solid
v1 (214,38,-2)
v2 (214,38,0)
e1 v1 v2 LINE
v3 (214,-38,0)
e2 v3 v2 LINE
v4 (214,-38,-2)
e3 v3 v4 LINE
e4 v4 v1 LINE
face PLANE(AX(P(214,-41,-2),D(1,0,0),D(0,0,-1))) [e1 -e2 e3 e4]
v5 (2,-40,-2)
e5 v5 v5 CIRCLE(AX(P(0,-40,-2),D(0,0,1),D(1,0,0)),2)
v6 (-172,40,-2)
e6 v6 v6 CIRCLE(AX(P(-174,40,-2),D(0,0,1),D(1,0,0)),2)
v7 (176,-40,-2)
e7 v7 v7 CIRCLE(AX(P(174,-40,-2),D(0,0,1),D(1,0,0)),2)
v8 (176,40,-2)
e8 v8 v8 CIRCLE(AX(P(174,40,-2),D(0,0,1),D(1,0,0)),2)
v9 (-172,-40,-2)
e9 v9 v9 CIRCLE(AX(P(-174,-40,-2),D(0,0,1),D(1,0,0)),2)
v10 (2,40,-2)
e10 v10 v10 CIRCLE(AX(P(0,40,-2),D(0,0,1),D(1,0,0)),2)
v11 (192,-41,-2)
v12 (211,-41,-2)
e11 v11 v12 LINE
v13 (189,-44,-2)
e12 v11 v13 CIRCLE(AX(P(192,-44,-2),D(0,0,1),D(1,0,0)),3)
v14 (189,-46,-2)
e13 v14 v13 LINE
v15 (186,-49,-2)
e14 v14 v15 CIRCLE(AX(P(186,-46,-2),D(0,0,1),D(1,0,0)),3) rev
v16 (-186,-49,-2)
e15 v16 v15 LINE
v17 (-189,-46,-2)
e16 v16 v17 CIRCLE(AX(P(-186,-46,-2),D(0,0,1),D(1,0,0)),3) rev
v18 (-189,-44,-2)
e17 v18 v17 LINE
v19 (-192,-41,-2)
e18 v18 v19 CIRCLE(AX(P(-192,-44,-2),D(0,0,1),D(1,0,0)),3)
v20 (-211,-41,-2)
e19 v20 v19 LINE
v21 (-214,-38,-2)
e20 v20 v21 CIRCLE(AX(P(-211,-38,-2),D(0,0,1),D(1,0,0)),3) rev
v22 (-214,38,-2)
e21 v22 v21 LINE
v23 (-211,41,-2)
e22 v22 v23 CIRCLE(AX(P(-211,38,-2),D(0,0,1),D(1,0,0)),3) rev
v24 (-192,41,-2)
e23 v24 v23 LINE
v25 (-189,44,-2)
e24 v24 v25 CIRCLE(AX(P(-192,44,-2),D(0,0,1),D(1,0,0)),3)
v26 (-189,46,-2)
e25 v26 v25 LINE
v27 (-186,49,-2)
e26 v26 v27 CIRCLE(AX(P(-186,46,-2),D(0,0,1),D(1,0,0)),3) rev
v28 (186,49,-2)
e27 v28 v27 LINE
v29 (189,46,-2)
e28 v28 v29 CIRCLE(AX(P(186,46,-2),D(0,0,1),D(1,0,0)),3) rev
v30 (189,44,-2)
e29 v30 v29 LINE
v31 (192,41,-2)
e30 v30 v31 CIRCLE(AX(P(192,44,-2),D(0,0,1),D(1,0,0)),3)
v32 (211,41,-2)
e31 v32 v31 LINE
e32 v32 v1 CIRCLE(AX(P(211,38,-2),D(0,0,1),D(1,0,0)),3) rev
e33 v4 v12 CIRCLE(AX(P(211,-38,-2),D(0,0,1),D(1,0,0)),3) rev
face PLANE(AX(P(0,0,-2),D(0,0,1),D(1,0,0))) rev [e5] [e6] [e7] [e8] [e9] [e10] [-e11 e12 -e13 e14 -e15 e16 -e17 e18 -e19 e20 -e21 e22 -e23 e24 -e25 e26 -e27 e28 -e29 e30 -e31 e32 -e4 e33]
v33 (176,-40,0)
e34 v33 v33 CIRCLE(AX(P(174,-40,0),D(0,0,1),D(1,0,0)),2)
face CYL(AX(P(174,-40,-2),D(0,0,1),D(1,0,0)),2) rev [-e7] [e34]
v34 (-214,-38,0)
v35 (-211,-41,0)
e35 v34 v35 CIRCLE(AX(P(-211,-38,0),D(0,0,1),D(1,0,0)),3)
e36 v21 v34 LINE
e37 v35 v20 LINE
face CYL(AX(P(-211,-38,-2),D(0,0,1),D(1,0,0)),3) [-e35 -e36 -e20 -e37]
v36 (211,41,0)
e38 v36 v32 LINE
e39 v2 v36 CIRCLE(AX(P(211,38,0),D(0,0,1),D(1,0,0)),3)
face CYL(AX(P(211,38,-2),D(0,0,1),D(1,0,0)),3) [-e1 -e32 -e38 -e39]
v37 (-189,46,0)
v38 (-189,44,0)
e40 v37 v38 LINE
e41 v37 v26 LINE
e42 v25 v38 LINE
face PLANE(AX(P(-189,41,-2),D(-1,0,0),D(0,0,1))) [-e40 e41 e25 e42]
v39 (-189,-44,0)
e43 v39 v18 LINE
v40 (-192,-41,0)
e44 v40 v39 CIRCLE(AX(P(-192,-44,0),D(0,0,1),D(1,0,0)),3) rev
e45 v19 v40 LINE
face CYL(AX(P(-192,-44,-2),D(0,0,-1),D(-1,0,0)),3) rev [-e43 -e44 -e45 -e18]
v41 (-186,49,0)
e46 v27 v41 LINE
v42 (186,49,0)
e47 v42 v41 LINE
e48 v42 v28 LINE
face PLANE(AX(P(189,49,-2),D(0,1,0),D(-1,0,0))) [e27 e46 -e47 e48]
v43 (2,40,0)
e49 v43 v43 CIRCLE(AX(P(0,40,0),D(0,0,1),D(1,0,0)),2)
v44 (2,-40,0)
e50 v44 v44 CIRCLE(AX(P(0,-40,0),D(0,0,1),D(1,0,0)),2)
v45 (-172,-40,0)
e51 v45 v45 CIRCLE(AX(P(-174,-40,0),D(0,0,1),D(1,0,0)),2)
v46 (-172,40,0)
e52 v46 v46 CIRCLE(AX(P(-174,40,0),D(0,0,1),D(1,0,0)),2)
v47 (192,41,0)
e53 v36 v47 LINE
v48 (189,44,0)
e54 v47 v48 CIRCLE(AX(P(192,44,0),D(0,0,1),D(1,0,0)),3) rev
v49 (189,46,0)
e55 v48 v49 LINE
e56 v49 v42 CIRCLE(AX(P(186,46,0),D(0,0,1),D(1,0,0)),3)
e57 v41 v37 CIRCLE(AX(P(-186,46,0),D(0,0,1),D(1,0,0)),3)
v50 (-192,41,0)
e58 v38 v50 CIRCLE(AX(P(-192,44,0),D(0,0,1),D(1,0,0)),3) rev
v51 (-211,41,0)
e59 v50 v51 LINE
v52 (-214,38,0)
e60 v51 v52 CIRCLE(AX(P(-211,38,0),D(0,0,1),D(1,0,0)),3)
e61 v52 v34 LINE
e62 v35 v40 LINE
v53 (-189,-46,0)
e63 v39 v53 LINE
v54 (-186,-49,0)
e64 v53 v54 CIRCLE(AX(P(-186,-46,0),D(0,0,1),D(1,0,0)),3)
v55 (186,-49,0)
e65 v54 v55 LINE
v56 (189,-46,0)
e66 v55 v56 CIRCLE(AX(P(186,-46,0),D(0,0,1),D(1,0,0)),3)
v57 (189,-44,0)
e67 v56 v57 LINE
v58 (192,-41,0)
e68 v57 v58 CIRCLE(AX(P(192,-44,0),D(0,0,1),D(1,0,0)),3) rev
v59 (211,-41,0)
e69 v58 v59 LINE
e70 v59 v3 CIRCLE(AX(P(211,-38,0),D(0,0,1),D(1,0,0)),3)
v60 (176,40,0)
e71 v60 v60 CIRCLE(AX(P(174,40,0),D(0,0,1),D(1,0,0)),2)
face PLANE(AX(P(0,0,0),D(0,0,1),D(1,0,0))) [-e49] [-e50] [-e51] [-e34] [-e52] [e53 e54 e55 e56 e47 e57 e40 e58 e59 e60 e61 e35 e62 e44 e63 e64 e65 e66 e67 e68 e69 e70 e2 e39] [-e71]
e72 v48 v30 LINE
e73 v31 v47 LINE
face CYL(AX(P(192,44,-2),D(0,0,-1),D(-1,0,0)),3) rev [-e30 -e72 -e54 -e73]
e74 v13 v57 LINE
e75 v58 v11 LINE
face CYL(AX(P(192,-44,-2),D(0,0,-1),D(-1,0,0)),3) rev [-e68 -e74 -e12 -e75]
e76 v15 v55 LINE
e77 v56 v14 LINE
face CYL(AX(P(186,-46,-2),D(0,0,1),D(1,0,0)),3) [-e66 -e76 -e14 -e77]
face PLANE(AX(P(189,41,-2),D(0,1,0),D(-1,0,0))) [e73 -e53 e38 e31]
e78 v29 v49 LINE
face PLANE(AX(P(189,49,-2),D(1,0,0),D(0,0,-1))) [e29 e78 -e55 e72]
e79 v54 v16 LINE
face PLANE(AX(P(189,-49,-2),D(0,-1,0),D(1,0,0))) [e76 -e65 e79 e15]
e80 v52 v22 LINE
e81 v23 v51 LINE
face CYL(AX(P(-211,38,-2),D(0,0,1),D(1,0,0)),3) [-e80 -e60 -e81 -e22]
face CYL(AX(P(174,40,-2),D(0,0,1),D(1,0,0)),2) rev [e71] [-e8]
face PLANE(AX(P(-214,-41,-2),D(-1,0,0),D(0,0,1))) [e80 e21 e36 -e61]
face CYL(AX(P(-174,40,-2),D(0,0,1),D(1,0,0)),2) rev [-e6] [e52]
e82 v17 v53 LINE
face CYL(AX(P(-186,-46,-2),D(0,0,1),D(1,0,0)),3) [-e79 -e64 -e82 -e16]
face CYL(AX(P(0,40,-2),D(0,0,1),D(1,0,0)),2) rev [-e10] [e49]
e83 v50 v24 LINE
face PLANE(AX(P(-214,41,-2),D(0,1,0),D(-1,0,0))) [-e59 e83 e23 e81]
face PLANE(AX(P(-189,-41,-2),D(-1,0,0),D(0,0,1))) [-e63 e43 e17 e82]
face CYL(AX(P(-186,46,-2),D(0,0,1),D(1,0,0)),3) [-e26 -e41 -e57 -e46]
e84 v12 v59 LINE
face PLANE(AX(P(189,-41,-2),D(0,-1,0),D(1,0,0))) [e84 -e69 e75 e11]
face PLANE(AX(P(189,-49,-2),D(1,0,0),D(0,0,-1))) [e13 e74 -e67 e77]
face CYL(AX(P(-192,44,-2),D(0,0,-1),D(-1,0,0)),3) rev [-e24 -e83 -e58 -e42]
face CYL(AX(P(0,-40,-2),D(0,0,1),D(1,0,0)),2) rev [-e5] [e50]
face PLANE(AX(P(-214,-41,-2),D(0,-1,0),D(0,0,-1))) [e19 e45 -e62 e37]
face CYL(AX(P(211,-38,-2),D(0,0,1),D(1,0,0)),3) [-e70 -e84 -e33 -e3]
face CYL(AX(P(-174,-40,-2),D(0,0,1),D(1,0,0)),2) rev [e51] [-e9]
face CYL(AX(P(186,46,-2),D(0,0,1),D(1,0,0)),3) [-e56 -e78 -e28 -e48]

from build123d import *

# Parameters (mm, degrees)
BASE_FLANGE1_DEPTH    = 2
BREAK_CORNER1_START   = -2
BREAK_CORNER1_DEPTH   = 2
BREAK_CORNER1_2_DEPTH = 2
SKETCH2_R             = 2
CUT_EXTRUDE1_DEPTH    = 10
LPATTERN1_COUNT       = 3
LPATTERN1_PITCH       = 174


# Read off the part's stored shape, not the designer's step: Break-Corner1
# Sheet-metal steps are written as plain solids
with BuildPart() as part:
    # Sketch1 → Base-Flange1 (new body)
    with BuildSketch(Plane.XY):
        Polygon((189, -49), (-189, -49), (-189, -41), (-214, -41), (-214, 41), (-189, 41), (-189, 49), (189, 49), (189, 41), (214, 41), (214, -41), (189, -41), align=None)
    extrude(amount=-BASE_FLANGE1_DEPTH)

    # Break-Corner1 outline → Break-Corner1 (cut)
    with BuildSketch(Plane.XY.offset(BREAK_CORNER1_START)):
        with BuildLine():
            Line((214, 41), (211, 41))
            ThreePointArc((211, 41), (213.121320344, 40.121320344), (214, 38))
            Line((214, 38), (214, 41))
        make_face()
        with BuildLine():
            ThreePointArc((186, 49), (188.121320344, 48.121320344), (189, 46))
            Line((189, 46), (189, 49))
            Line((189, 49), (186, 49))
        make_face()
        with BuildLine():
            Line((214, -41), (214, -38))
            ThreePointArc((214, -38), (213.121320344, -40.121320344), (211, -41))
            Line((211, -41), (214, -41))
        make_face()
        with BuildLine():
            ThreePointArc((-189, 46), (-188.121320344, 48.121320344), (-186, 49))
            Line((-186, 49), (-189, 49))
            Line((-189, 49), (-189, 46))
        make_face()
        with BuildLine():
            Line((189, -49), (189, -46))
            ThreePointArc((189, -46), (188.121320344, -48.121320344), (186, -49))
            Line((186, -49), (189, -49))
        make_face()
        with BuildLine():
            ThreePointArc((-214, 38), (-213.121320344, 40.121320344), (-211, 41))
            Line((-211, 41), (-214, 41))
            Line((-214, 41), (-214, 38))
        make_face()
        with BuildLine():
            Line((-189, -49), (-186, -49))
            ThreePointArc((-186, -49), (-188.121320344, -48.121320344), (-189, -46))
            Line((-189, -46), (-189, -49))
        make_face()
        with BuildLine():
            ThreePointArc((-211, -41), (-213.121320344, -40.121320344), (-214, -38))
            Line((-214, -38), (-214, -41))
            Line((-214, -41), (-211, -41))
        make_face()
    extrude(amount=BREAK_CORNER1_DEPTH, mode=Mode.SUBTRACT)

    # Break-Corner1 2 outline → Break-Corner1 2 (add)
    with BuildSketch(Plane.XY.offset(BREAK_CORNER1_START)):
        with BuildLine():
            Line((189, 41), (192, 41))
            ThreePointArc((192, 41), (189.878679656, 41.878679656), (189, 44))
            Line((189, 44), (189, 41))
        make_face()
        with BuildLine():
            ThreePointArc((189, -44), (189.878679656, -41.878679656), (192, -41))
            Line((192, -41), (189, -41))
            Line((189, -41), (189, -44))
        make_face()
        with BuildLine():
            Line((-189, 41), (-189, 44))
            ThreePointArc((-189, 44), (-189.878679656, 41.878679656), (-192, 41))
            Line((-192, 41), (-189, 41))
        make_face()
        with BuildLine():
            ThreePointArc((-192, -41), (-189.878679656, -41.878679656), (-189, -44))
            Line((-189, -44), (-189, -41))
            Line((-189, -41), (-192, -41))
        make_face()
    extrude(amount=BREAK_CORNER1_2_DEPTH)

    # Sketch2 → Cut-Extrude1 (cut)
    with BuildSketch(Plane.XY):
        with Locations((-174, 40)):
            Circle(SKETCH2_R)
        with Locations((-174, -40)):
            Circle(SKETCH2_R)
    cut_extrude1 = extrude(amount=-CUT_EXTRUDE1_DEPTH, mode=Mode.SUBTRACT)

    # LPattern1: Cut-Extrude1 ×3
    with Locations(*[(i * LPATTERN1_PITCH, 0, 0) for i in range(1, LPATTERN1_COUNT)]):
        add(cut_extrude1, mode=Mode.SUBTRACT)


solid = part.part
